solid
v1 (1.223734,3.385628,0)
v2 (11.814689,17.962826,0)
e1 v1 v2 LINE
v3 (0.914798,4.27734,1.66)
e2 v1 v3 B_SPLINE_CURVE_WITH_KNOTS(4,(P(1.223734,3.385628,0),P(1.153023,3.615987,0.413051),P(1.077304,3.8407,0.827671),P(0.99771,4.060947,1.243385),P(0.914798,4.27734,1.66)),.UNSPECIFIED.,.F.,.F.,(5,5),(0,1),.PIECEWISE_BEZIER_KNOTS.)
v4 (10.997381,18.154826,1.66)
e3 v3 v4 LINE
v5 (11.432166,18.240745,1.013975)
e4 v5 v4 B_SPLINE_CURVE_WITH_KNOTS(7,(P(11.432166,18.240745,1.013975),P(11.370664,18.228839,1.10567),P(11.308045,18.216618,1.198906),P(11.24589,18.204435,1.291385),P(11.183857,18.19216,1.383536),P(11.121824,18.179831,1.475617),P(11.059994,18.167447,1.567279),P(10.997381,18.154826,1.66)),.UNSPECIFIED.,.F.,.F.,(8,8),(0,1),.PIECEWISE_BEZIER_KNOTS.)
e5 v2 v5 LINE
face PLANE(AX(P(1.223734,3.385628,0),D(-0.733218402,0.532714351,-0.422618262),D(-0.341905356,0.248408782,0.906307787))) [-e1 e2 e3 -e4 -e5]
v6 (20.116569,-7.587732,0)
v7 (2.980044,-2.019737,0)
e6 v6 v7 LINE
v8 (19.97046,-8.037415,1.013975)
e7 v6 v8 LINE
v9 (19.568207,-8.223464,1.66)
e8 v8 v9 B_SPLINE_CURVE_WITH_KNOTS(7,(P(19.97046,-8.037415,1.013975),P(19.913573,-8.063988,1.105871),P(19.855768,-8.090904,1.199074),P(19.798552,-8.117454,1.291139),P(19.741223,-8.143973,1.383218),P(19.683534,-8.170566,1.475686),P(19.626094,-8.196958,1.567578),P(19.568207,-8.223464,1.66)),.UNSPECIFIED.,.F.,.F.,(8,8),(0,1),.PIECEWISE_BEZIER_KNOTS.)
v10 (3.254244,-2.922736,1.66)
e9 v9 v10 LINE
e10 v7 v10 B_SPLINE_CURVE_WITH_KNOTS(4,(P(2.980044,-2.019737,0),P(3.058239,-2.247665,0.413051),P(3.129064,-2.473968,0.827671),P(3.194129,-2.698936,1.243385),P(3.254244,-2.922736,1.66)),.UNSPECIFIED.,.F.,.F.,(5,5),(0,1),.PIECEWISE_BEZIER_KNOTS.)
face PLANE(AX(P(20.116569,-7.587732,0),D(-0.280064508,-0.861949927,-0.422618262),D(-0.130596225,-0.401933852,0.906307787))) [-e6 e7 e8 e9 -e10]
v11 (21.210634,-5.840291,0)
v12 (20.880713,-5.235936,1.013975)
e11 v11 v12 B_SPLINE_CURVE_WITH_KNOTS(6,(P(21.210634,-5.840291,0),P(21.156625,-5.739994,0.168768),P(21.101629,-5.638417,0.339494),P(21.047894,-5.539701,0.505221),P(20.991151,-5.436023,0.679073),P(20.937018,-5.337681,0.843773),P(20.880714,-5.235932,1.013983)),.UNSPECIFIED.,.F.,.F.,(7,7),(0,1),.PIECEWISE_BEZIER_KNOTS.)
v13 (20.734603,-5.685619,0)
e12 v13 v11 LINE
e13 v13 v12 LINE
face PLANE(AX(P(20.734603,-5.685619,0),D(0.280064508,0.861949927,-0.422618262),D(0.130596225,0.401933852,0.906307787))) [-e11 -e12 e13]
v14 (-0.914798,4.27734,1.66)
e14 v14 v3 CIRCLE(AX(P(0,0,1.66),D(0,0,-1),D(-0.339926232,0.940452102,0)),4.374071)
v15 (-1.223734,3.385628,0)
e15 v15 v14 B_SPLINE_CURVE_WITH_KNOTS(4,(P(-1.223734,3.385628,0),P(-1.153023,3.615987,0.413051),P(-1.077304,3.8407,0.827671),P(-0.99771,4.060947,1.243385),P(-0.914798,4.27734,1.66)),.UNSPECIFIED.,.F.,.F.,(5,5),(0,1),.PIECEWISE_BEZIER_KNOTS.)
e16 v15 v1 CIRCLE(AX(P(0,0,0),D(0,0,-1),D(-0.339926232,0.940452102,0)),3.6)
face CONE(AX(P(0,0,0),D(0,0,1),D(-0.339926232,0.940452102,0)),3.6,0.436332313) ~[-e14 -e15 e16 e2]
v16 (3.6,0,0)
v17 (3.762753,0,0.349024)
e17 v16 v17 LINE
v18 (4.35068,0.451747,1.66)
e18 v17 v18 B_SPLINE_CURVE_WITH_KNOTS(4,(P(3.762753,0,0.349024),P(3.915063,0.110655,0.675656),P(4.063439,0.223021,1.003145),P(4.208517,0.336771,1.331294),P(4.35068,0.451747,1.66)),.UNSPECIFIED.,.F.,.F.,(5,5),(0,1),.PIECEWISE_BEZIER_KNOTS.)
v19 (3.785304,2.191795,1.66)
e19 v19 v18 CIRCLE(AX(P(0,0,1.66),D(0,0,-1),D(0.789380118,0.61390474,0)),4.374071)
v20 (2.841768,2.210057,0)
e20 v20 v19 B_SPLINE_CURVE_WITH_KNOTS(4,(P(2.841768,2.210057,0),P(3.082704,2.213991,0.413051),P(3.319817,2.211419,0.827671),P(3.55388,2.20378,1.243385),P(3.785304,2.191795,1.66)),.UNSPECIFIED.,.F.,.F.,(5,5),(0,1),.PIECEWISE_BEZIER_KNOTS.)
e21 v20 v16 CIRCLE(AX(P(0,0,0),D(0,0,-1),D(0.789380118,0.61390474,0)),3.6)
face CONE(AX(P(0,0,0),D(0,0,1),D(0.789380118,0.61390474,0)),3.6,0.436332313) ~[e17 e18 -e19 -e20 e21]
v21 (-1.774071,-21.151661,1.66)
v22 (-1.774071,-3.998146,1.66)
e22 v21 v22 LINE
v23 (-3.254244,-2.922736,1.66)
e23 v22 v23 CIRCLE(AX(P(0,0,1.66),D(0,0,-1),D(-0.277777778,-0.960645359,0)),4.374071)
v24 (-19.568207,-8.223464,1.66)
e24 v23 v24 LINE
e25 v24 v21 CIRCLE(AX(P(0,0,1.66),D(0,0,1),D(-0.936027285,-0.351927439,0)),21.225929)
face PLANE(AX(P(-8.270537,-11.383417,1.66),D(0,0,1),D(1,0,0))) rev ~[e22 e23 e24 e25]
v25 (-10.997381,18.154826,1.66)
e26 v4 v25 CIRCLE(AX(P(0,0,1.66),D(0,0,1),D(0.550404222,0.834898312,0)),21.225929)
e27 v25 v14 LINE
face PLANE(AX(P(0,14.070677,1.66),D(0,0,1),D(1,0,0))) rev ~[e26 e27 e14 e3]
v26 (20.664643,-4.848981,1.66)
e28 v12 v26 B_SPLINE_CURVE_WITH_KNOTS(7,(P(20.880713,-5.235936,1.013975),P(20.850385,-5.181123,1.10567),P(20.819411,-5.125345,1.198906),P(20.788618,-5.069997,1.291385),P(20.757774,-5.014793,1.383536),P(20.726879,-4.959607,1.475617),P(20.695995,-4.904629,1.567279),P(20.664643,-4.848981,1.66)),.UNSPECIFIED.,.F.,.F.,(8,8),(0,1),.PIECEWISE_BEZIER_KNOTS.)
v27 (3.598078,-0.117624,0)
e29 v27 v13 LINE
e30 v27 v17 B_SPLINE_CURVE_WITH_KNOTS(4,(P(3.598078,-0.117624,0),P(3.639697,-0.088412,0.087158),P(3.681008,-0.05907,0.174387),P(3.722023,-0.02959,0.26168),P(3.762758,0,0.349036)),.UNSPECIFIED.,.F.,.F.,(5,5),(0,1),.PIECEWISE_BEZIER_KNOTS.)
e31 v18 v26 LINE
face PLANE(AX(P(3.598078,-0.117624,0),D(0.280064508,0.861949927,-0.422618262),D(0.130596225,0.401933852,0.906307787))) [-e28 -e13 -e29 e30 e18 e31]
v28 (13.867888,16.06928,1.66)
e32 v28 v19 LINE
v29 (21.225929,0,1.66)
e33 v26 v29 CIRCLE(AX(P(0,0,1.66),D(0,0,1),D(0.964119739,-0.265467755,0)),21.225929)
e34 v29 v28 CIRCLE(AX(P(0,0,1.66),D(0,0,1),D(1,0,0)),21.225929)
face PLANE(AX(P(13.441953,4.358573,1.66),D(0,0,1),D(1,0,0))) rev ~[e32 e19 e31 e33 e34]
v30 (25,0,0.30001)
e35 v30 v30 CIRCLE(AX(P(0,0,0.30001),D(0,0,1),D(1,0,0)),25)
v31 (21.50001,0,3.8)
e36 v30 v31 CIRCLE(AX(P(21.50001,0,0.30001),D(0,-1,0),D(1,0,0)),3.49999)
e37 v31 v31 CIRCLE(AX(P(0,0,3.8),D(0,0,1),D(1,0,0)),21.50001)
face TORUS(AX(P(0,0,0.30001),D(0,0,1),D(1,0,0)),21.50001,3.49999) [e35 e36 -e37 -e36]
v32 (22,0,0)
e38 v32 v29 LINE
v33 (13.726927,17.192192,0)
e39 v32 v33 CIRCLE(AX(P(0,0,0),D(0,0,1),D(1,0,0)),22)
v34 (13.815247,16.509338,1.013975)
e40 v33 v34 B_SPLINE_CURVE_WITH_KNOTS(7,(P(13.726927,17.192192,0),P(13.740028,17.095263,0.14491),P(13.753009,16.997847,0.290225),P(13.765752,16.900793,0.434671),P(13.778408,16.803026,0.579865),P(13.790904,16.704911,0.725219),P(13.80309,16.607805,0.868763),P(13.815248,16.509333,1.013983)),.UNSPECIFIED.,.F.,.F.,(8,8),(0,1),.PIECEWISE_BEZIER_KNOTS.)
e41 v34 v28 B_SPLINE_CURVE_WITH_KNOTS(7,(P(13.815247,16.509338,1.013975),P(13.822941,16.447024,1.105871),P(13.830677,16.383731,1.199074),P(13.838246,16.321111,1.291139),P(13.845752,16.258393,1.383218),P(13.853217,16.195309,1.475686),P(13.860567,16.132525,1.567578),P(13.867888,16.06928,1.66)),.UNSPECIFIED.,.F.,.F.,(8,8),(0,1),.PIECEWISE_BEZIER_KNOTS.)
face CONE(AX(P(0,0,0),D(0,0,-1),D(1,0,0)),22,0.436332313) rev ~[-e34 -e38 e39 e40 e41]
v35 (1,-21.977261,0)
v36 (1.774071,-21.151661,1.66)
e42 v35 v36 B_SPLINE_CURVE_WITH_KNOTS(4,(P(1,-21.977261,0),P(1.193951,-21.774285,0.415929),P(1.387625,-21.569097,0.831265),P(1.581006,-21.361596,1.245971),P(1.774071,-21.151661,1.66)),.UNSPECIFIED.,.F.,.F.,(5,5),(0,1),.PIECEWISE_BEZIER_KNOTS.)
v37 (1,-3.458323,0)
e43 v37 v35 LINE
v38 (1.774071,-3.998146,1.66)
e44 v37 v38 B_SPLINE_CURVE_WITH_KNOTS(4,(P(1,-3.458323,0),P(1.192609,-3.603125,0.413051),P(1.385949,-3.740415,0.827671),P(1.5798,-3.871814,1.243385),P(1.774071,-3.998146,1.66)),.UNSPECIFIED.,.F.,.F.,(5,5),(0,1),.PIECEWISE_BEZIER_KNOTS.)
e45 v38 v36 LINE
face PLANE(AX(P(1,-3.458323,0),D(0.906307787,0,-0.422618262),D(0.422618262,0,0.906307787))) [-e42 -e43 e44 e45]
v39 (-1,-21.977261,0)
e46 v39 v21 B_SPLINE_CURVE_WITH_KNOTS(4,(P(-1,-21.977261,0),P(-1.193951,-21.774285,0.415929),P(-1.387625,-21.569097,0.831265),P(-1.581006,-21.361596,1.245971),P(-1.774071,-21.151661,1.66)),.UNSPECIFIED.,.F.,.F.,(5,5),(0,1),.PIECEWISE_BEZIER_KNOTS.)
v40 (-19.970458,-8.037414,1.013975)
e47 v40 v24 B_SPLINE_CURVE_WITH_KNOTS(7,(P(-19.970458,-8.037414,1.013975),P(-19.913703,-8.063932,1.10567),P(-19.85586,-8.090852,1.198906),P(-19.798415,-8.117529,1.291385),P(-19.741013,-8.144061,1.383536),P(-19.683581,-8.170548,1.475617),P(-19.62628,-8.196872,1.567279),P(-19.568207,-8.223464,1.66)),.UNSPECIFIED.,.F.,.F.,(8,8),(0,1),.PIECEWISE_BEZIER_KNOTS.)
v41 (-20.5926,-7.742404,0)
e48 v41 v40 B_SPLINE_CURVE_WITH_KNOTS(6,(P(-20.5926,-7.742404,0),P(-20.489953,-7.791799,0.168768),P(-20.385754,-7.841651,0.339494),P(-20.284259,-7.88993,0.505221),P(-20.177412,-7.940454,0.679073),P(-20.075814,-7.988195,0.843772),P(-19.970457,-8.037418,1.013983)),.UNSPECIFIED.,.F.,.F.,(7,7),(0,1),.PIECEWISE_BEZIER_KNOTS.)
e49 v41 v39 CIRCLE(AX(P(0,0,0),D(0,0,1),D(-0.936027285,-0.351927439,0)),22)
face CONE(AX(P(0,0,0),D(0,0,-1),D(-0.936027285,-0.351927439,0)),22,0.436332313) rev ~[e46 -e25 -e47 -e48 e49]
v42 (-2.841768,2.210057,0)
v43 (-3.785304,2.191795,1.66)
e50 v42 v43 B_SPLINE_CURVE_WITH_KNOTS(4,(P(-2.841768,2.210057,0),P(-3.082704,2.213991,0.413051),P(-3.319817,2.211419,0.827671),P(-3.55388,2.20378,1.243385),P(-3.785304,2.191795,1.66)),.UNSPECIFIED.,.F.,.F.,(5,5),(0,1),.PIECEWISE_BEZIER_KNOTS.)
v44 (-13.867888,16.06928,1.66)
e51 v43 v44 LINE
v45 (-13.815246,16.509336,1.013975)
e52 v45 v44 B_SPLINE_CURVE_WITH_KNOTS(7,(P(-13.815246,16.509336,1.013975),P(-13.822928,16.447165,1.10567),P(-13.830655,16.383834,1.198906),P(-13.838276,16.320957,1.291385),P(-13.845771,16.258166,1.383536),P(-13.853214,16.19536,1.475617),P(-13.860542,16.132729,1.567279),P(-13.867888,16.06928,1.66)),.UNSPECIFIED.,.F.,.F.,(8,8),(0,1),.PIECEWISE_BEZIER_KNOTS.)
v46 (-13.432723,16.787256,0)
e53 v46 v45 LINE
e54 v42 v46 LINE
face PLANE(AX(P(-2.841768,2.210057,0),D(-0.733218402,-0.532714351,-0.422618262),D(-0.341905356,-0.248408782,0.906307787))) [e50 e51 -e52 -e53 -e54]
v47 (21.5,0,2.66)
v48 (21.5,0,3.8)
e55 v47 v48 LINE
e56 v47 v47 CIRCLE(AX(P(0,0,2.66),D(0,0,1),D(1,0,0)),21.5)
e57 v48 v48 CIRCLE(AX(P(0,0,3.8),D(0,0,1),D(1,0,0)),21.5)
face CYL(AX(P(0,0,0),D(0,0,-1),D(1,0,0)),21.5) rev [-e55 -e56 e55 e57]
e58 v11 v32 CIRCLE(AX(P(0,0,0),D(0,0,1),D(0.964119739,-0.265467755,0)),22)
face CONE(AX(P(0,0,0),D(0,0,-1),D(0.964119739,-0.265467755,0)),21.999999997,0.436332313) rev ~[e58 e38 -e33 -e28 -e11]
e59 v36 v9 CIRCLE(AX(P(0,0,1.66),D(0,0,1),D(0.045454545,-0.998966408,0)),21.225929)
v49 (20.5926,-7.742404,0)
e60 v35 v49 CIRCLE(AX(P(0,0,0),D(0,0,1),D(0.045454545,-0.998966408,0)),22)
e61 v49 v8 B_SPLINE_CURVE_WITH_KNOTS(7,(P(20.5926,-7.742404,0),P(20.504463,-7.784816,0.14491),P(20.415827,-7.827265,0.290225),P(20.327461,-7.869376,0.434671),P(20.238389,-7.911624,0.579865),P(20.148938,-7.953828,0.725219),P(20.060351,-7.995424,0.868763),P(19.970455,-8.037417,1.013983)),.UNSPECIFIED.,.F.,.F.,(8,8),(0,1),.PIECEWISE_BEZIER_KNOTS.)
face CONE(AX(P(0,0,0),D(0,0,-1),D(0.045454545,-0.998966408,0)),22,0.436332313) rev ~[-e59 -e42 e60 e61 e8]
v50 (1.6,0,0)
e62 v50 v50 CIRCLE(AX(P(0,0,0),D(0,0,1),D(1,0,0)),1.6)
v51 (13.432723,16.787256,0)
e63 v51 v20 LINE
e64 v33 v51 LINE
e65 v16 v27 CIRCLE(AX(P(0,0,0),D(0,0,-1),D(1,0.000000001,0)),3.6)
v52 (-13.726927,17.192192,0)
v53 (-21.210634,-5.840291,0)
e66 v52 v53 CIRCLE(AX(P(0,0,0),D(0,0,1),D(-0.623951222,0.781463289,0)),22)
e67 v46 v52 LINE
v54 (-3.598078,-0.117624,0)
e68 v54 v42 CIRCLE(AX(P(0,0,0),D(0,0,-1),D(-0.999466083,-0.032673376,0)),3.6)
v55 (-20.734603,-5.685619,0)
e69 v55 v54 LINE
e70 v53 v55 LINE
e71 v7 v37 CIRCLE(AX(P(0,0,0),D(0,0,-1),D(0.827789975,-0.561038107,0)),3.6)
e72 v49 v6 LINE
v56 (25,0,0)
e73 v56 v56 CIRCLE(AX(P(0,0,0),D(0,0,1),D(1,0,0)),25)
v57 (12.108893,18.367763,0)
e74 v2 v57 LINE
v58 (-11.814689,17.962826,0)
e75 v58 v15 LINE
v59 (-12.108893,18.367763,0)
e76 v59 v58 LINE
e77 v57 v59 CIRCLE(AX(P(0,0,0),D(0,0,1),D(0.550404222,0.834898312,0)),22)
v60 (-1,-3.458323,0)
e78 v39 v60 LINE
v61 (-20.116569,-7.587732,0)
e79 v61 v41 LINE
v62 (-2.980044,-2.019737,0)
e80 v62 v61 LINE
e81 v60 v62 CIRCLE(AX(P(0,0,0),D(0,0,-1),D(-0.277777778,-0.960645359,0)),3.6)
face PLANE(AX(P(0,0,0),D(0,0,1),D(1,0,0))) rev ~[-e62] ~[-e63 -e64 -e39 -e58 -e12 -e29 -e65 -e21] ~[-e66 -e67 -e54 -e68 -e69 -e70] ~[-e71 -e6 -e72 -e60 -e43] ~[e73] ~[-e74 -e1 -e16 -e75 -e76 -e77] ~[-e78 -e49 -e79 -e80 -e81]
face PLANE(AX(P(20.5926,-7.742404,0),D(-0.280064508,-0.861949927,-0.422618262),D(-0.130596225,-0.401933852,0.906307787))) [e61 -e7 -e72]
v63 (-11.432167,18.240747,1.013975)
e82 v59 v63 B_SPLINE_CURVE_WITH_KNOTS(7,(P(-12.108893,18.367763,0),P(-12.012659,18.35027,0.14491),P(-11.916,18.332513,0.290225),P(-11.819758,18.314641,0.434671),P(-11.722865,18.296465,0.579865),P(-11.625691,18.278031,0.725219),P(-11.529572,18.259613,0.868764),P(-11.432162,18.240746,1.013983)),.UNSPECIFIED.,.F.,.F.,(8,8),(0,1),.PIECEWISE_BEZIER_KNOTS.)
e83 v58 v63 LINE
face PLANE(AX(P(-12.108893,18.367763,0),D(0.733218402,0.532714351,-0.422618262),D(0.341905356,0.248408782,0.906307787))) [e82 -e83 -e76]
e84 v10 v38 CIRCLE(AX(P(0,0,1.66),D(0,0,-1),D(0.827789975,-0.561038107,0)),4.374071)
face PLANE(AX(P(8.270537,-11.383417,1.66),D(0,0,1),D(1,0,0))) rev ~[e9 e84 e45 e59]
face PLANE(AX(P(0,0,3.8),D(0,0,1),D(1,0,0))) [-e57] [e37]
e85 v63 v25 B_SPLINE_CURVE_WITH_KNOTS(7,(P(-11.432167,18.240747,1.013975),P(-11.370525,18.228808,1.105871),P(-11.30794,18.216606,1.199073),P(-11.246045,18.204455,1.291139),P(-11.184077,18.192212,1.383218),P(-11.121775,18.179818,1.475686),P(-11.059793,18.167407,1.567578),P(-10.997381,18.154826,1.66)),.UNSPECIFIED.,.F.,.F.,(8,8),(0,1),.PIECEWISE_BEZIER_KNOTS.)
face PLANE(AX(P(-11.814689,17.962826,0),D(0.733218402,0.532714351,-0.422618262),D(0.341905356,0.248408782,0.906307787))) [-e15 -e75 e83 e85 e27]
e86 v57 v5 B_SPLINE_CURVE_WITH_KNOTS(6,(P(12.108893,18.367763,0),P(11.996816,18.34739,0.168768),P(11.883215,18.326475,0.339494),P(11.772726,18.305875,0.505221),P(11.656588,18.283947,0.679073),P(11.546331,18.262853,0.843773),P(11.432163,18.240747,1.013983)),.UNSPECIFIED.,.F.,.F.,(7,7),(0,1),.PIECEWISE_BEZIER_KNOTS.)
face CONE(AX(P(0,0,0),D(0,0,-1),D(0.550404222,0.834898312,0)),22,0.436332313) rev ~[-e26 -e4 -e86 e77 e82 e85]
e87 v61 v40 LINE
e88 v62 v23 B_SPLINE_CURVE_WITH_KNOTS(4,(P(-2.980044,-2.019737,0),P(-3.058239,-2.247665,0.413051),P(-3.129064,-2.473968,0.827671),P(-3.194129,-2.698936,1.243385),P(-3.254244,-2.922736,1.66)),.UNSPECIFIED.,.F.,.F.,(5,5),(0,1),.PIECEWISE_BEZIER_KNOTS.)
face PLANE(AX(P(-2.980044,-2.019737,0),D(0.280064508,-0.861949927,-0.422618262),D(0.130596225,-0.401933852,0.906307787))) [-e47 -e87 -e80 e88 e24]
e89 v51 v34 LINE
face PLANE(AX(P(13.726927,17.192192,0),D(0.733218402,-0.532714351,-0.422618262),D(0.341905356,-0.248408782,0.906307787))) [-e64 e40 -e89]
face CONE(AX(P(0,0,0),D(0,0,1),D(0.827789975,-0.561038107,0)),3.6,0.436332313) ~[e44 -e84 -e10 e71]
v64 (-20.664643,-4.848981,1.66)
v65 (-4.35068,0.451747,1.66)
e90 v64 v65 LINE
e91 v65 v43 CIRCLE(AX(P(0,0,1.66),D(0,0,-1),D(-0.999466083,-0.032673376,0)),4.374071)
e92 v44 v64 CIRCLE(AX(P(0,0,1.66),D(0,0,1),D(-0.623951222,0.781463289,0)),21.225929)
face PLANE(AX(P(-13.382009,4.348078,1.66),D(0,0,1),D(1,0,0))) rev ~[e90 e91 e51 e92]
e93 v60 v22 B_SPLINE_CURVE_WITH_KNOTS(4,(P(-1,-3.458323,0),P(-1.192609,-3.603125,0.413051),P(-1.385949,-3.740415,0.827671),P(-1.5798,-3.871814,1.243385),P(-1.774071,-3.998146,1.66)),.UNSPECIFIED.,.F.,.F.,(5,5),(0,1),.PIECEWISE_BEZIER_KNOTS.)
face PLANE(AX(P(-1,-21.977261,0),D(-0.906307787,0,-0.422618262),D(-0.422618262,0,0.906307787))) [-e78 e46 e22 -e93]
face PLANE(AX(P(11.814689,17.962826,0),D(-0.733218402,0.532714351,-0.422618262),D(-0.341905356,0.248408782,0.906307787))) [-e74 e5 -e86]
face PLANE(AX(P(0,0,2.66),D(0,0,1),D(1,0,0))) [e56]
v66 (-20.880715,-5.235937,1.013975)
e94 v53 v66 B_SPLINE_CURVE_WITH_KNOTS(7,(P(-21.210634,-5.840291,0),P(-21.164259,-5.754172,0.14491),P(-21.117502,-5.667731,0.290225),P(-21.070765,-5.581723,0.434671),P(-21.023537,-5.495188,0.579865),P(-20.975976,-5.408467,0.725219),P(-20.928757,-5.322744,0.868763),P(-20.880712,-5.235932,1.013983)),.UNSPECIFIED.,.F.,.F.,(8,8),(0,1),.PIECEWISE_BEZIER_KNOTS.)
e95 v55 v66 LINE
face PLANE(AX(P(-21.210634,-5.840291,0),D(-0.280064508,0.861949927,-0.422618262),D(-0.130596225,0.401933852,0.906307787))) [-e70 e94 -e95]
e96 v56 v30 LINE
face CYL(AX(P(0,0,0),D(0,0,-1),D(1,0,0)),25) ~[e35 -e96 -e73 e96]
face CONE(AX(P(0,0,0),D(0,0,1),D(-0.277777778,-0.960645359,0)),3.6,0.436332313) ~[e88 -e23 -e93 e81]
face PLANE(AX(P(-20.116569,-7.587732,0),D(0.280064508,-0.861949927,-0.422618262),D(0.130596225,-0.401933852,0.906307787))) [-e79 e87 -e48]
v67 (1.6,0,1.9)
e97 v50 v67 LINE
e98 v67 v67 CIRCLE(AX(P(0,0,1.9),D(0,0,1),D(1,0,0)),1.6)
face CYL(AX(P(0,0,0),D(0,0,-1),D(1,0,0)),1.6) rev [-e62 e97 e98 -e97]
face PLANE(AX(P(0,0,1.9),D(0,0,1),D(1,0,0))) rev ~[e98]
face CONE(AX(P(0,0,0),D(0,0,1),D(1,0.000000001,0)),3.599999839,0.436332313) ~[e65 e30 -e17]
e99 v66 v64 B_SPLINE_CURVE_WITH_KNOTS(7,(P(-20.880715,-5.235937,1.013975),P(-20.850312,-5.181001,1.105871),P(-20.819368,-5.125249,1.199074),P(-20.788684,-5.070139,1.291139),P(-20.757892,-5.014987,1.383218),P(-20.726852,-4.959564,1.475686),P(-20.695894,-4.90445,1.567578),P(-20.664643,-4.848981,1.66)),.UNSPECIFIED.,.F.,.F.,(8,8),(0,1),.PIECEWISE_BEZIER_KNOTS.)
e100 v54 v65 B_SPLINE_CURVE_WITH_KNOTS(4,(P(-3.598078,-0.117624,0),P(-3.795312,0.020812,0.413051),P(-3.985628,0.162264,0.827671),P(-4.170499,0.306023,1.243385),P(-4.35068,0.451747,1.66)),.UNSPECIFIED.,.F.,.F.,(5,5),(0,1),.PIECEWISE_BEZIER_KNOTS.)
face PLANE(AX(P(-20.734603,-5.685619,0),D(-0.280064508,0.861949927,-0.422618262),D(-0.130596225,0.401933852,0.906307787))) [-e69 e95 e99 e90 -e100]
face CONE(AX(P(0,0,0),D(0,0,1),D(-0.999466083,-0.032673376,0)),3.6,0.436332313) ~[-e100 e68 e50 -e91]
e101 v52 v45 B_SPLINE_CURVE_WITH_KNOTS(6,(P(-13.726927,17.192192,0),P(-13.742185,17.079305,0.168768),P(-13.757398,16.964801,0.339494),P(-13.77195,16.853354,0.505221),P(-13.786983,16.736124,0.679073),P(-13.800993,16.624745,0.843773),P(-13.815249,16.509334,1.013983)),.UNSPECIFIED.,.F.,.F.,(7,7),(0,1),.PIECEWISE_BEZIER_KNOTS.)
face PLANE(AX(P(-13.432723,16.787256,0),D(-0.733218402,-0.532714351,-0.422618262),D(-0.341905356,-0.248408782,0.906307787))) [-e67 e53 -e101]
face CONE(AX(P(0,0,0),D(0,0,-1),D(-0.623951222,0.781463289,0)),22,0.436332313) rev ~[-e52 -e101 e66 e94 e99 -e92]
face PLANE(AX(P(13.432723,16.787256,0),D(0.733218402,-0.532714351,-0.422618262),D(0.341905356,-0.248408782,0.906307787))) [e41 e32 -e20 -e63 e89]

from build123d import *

# Parameters (mm, degrees)
F0_R     = 25
F0_R_2   = 21.5
F1_DEPTH = 3.8
F2_DEPTH = 2.66
F3_R     = 3.49999
F4_R     = 1.6
F5_DEPTH = 1.9
F6_DEPTH = 1.66
F6_TAPER = 25


# Not quite as in the source:
# - a fillet or chamfer is up to 0.001 mm smaller than in the source, because OpenCascade refuses the exact size


with BuildPart() as f1:
    # F0 (on Top) → F1 (new body)
    with BuildSketch(Plane.XY):
        Circle(F0_R)
        Circle(F0_R_2, mode=Mode.SUBTRACT)
    extrude(amount=F1_DEPTH)

    # F0 (on Top) → F2 (join, through all)
    with BuildSketch(Plane.XY):
        Circle(F0_R_2)
    extrude(amount=F2_DEPTH)

    # F3 (radius 3.5 in the source; OpenCascade refuses exactly that, so slightly less here)
    f3_edges = [f1.edges().sort_by_distance(p)[0] for p in [
        (-25, 0, 3.8),
    ]]
    fillet(f3_edges, radius=F3_R)

    # F4 (on face) → F5 (cut)
    with BuildSketch(Plane.XY):
        Circle(F4_R)
    extrude(amount=F5_DEPTH, mode=Mode.SUBTRACT)

    # F4 (on face) → F6 (cut, through all)
    with BuildSketch(Plane.XY):
        with BuildLine():
            Line((-1, -21.4767315949), (-1, -3.4583232932))
            ThreePointArc((-1, -3.4583232932), (-2.1160269083, -2.9124611797), (-2.980043909, -2.0197371859))
            Line((-2.980043909, -2.0197371859), (-20.1165685377, -7.5877315628))
            ThreePointArc((-20.1165685377, -7.5877315628), (-12.6373829243, -17.3938653791), (-1, -21.4767315949))
        make_face()
        with BuildLine():
            Line((-1, -21.9772609758), (-1, -21.4767315949))
            ThreePointArc((-1, -21.4767315949), (-12.6373829243, -17.3938653791), (-20.1165685377, -7.5877315628))
            Line((-20.1165685377, -7.5877315628), (-20.592600267, -7.7424036476))
            ThreePointArc((-20.592600267, -7.7424036476), (-12.9312755504, -17.7983738762), (-1, -21.9772609758))
        make_face()
        with BuildLine():
            Line((20.1165685377, -7.5877315628), (2.980043909, -2.0197371859))
            ThreePointArc((2.980043909, -2.0197371859), (2.1160269083, -2.9124611797), (1, -3.4583232932))
            Line((1, -3.4583232932), (1, -21.4767315949))
            ThreePointArc((1, -21.4767315949), (12.6373829243, -17.3938653791), (20.1165685377, -7.5877315628))
        make_face()
        with BuildLine():
            Line((20.592600267, -7.7424036476), (20.1165685377, -7.5877315628))
            ThreePointArc((20.1165685377, -7.5877315628), (12.6373829243, -17.3938653791), (1, -21.4767315949))
            Line((1, -21.4767315949), (1, -21.9772609758))
            ThreePointArc((1, -21.9772609758), (12.9312755504, -17.7983738762), (20.592600267, -7.7424036476))
        make_face()
        with BuildLine():
            ThreePointArc((2.8417684238, 2.2100570639), (3.4051700637, 1.1682537555), (3.6, 0))
            ThreePointArc((3.6, 0), (3.5995194424, -0.0588199284), (3.5980778978, -0.1176241533))
            Line((3.5980778978, -0.1176241533), (20.7346025264, -5.6856185302))
            ThreePointArc((20.7346025264, -5.6856185302), (21.307791466, -2.8684530397), (21.5, 0))
            ThreePointArc((21.5, 0), (19.3785131848, 9.3125306307), (13.4327230933, 16.7872555916))
            Line((13.4327230933, 16.7872555916), (2.8417684238, 2.2100570639))
        make_face()
        with BuildLine():
            Line((13.7269268818, 17.192192367), (13.4327230933, 16.7872555916))
            ThreePointArc((13.4327230933, 16.7872555916), (19.3785131848, 9.3125306307), (21.5, 0))
            ThreePointArc((21.5, 0), (21.307791466, -2.8684530397), (20.7346025264, -5.6856185302))
            Line((20.7346025264, -5.6856185302), (21.2106342558, -5.8402906151))
            ThreePointArc((21.2106342558, -5.8402906151), (21.8017654518, -2.9466969961), (22, 0))
            ThreePointArc((22, 0), (19.8241316506, 9.5395914116), (13.7269268818, 17.192192367))
        make_face()
        with BuildLine():
            ThreePointArc((-1.223734435, 3.3856275685), (0, 3.6), (1.223734435, 3.3856275685))
            Line((1.223734435, 3.3856275685), (11.8146891046, 17.9628260962))
            ThreePointArc((11.8146891046, 17.9628260962), (0, 21.5), (-11.8146891046, 17.9628260962))
            Line((-11.8146891046, 17.9628260962), (-1.223734435, 3.3856275685))
        make_face()
        with BuildLine():
            ThreePointArc((-11.8146891046, 17.9628260962), (0, 21.5), (11.8146891046, 17.9628260962))
            Line((11.8146891046, 17.9628260962), (12.108892893, 18.3677628716))
            ThreePointArc((12.108892893, 18.3677628716), (0, 22), (-12.108892893, 18.3677628716))
            Line((-12.108892893, 18.3677628716), (-11.8146891046, 17.9628260962))
        make_face()
        with BuildLine():
            ThreePointArc((-3.5980778978, -0.1176241533), (-3.4238034587, 1.1124611797), (-2.8417684238, 2.2100570639))
            Line((-2.8417684238, 2.2100570639), (-13.4327230933, 16.7872555916))
            ThreePointArc((-13.4327230933, 16.7872555916), (-20.4477151003, 6.6438653791), (-20.7346025264, -5.6856185302))
            Line((-20.7346025264, -5.6856185302), (-3.5980778978, -0.1176241533))
        make_face()
        with BuildLine():
            ThreePointArc((-20.7346025264, -5.6856185302), (-20.4477151003, 6.6438653791), (-13.4327230933, 16.7872555916))
            Line((-13.4327230933, 16.7872555916), (-13.7269268818, 17.192192367))
            ThreePointArc((-13.7269268818, 17.192192367), (-20.9232433585, 6.7983738762), (-21.2106342558, -5.8402906151))
            Line((-21.2106342558, -5.8402906151), (-20.7346025264, -5.6856185302))
        make_face()
    extrude(amount=F6_DEPTH, taper=F6_TAPER, mode=Mode.SUBTRACT)


solid = f1.part
